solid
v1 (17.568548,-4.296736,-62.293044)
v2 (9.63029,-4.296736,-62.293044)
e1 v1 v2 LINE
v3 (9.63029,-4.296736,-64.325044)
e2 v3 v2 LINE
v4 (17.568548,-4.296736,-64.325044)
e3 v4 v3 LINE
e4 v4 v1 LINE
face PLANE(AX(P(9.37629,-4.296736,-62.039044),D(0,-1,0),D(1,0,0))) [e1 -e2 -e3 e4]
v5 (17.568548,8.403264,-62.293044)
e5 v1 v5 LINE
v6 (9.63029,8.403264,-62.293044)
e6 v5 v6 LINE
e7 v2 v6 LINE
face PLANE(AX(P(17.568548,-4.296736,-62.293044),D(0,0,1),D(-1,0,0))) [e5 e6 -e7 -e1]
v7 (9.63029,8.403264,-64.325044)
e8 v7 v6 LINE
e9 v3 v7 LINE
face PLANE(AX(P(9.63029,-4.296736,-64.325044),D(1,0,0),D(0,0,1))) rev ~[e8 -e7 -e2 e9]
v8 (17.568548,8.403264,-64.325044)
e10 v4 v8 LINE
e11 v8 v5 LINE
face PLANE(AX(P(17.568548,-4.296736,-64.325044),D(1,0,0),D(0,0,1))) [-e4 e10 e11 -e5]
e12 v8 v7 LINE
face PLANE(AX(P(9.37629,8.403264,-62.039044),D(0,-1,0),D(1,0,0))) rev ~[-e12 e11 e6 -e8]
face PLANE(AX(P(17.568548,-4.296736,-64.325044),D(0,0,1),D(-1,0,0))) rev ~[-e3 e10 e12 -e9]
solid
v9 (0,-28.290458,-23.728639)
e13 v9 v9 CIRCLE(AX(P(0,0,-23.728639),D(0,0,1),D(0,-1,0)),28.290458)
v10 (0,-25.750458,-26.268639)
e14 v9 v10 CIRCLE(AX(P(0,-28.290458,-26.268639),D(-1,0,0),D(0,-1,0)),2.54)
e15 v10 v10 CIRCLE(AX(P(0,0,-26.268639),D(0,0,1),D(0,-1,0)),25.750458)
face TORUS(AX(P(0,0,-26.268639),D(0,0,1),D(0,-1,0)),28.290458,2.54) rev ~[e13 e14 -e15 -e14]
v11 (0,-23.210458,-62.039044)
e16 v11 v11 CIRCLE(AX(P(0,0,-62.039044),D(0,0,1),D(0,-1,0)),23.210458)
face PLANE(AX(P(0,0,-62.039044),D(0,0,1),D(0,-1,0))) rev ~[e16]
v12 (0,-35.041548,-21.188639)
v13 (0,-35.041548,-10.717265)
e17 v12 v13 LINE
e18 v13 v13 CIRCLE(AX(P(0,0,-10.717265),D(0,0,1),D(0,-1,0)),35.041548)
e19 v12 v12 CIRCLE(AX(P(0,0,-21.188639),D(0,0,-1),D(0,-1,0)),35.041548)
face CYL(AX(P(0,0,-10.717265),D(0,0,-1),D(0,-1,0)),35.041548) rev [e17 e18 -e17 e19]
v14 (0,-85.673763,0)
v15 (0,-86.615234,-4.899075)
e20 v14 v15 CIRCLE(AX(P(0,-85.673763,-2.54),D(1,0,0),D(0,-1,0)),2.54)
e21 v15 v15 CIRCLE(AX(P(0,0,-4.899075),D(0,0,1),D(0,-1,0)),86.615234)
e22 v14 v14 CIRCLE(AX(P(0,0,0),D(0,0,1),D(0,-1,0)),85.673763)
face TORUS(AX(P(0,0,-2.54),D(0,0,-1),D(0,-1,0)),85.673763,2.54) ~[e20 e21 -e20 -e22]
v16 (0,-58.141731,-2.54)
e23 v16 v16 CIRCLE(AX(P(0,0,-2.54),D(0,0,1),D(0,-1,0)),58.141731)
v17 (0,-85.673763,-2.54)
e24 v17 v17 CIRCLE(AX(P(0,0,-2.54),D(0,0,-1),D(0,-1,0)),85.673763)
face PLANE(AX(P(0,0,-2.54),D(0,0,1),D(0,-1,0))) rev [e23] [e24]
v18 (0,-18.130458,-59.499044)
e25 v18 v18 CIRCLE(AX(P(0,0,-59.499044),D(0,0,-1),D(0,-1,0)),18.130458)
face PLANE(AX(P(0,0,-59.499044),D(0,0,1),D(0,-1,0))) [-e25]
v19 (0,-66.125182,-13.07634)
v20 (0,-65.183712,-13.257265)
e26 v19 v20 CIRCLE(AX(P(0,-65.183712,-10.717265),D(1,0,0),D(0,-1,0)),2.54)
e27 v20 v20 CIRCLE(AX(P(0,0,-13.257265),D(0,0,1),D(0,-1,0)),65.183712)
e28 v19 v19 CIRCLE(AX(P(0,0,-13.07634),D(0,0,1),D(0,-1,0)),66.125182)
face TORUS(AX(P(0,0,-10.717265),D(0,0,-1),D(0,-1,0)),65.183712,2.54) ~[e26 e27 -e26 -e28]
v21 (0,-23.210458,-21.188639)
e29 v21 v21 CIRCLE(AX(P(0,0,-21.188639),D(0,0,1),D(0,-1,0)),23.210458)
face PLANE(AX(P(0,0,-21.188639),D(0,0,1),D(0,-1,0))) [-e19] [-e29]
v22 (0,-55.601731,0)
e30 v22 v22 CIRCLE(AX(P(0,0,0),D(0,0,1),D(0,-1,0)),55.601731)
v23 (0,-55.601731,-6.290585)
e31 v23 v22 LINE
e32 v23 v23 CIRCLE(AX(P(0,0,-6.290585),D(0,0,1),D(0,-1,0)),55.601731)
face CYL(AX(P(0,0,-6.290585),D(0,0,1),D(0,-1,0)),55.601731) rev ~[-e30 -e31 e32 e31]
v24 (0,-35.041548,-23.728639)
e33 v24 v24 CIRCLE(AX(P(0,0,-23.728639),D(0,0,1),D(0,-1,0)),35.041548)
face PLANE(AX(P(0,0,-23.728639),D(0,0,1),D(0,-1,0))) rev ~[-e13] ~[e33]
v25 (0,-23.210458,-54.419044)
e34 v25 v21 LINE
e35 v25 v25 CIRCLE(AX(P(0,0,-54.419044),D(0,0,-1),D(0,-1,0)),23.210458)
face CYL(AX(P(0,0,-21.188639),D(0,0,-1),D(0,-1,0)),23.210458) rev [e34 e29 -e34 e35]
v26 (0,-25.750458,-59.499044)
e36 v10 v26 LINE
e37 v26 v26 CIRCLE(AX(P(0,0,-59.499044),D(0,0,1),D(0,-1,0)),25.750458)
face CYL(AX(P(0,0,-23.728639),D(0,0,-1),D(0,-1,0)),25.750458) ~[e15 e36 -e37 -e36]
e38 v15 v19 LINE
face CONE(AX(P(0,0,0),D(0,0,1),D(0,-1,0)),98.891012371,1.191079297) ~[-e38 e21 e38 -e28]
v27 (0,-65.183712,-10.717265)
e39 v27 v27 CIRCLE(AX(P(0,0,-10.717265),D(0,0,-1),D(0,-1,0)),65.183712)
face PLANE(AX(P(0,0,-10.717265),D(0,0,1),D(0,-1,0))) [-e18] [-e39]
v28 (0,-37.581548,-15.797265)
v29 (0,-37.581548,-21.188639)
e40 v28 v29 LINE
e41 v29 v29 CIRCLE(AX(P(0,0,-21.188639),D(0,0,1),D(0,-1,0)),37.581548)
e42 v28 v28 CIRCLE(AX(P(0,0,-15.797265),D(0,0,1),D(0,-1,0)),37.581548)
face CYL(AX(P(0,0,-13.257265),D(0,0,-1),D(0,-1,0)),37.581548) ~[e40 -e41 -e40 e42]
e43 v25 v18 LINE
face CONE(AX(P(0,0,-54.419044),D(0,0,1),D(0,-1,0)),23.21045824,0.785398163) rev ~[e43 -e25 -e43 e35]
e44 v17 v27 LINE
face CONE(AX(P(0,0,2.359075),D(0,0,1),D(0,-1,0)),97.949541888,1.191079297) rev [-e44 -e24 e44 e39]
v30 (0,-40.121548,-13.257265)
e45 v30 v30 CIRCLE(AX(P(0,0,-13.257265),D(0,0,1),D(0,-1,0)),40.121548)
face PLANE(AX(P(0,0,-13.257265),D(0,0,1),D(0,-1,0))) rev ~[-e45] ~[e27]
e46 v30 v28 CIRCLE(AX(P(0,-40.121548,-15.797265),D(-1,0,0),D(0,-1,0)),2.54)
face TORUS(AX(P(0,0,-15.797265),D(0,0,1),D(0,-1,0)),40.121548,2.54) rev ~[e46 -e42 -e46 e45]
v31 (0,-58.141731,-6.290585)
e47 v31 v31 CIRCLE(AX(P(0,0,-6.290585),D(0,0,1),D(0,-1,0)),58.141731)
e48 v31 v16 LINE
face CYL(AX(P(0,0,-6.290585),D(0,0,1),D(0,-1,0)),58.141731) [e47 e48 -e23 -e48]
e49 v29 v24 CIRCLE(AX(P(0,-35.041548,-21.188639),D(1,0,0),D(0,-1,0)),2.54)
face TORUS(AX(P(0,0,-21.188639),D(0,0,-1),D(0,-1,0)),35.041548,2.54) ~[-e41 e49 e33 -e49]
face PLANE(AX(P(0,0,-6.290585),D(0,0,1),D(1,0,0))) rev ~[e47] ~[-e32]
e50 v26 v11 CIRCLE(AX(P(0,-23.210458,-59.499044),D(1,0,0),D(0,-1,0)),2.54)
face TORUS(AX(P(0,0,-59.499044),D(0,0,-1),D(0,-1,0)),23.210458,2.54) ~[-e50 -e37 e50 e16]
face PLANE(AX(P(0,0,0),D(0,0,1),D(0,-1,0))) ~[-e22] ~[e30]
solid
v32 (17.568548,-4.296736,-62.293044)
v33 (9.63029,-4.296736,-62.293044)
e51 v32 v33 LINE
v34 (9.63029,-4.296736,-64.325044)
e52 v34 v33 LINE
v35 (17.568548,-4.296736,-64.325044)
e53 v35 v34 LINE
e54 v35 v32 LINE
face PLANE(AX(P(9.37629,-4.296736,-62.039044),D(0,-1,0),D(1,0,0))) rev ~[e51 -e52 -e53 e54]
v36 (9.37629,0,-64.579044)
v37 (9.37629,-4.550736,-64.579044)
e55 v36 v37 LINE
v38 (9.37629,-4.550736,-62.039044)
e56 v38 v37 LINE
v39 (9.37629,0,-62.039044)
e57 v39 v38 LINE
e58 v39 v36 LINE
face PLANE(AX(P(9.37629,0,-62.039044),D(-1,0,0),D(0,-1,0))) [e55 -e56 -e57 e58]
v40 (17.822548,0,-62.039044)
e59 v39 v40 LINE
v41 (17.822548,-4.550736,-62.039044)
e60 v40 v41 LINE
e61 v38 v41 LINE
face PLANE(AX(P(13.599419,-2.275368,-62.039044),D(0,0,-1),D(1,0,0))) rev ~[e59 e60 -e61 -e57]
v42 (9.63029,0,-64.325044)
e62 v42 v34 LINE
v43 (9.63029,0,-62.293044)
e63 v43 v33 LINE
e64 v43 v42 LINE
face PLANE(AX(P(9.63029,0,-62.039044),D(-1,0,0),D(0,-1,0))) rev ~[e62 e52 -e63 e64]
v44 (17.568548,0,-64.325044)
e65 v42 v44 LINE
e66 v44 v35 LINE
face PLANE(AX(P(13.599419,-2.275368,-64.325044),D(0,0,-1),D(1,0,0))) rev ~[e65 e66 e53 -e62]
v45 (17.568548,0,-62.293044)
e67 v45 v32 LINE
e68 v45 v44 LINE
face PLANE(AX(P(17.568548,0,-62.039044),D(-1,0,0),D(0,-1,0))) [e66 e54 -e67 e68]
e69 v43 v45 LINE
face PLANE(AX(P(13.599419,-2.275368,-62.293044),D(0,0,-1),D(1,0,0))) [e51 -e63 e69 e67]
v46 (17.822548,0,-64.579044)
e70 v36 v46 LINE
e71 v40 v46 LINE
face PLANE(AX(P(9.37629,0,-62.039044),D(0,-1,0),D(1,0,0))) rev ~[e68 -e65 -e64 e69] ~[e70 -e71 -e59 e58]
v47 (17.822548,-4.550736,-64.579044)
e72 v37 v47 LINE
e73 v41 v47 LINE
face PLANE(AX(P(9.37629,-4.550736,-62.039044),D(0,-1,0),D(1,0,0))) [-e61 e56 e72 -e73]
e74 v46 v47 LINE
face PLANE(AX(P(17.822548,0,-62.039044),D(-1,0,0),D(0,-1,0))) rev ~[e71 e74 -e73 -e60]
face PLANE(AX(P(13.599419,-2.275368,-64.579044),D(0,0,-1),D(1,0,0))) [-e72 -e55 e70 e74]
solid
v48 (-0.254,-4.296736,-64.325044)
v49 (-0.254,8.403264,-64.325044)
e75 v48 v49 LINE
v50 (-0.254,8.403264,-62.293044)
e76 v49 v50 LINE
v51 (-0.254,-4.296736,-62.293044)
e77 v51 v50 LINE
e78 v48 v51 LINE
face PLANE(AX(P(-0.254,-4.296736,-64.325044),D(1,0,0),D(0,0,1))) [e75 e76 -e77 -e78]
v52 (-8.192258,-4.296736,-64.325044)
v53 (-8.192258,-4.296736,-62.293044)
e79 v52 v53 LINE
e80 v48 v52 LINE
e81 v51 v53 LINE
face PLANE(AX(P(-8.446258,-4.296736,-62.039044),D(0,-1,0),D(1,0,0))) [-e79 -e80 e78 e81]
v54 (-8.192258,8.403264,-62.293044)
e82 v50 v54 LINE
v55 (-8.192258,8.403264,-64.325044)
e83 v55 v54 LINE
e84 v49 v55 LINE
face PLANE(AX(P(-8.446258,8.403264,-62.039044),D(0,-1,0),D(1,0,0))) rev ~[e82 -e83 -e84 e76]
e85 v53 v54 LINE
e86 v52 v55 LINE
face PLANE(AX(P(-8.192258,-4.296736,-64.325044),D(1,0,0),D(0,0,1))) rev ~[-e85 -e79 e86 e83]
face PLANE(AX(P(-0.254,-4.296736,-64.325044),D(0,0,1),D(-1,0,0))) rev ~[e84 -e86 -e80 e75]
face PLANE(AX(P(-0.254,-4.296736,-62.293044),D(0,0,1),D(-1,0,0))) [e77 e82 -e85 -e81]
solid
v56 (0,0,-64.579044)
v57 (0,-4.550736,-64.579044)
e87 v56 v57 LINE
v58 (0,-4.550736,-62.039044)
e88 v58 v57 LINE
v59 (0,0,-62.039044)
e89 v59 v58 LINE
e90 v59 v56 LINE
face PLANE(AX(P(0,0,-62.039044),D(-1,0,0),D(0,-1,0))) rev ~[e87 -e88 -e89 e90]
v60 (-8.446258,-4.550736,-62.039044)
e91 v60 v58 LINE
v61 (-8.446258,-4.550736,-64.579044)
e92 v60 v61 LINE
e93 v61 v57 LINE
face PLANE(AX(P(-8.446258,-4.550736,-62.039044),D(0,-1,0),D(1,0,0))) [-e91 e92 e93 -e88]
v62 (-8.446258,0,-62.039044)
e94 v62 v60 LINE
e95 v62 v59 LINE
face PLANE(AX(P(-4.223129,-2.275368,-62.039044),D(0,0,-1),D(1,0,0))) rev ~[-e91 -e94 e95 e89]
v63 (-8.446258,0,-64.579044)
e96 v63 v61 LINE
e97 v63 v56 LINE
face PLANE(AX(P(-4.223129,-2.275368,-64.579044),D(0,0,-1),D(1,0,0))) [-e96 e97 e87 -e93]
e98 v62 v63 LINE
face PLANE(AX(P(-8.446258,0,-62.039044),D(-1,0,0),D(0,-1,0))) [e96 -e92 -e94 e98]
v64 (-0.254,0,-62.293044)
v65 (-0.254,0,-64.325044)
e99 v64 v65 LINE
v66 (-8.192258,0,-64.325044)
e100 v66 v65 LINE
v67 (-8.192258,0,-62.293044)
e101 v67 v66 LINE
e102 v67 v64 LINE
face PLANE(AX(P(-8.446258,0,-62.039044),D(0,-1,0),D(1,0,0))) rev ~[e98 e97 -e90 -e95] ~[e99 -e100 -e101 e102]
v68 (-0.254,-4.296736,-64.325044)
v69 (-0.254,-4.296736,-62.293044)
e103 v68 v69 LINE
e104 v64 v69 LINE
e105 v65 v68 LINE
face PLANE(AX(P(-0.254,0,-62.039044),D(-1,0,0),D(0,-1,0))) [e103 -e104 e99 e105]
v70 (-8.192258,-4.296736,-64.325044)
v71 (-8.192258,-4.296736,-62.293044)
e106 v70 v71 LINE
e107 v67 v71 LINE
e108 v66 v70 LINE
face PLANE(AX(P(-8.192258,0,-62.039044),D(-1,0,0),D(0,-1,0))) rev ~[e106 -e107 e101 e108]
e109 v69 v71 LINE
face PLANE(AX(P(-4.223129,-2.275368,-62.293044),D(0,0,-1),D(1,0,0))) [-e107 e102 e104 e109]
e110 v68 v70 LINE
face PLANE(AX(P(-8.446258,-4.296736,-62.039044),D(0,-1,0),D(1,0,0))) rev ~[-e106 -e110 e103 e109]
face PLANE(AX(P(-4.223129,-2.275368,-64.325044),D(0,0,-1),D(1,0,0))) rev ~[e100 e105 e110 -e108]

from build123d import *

# Parameters (mm, degrees)
F2_T     = 2.54
F3_R     = 2.54
F4_SIZE  = 5.08
F5_W     = 8.4462584928
F5_H     = 4.5507363975
F6_DEPTH = 2.54
F7_T     = -0.254
F7_2_T   = -0.254
F8_DEPTH = 12.7


# Not quite as in the source:
# - a shell that OpenCascade refuses in one call is made with other operations: the cavity is built on its own and cut out


with BuildPart() as f1:
    # F0 (on Right) → F1 (revolve)
    with BuildSketch(Plane.YZ):
        Polygon((-55.6017309427, 0), (-98.8910123706, 0), (-65.6718313694, -13.2572650909), (-37.5815480947, -13.2572650909), (-37.5815480947, -23.7286388874), (-25.7504582405, -23.7286388874), (-25.7504582405, -62.0390437543), (0, -62.0390437543), (0, -6.2905848026), (-55.6017309427, -6.2905848026), align=None)
    revolve(axis=Axis((0, 0, 15.0363594294), (0, 0, 1)))

    # F2: shell of thickness 2.54, made by hand


with BuildPart() as f2_core1:
    # F2_t2: copy of F1
    add(f1.part)

    # the walls: a layer under each face that stays
    f2_faces = [f2_core1.faces().sort_by_distance(p)[0] for p in [
        (0, 55.6017309427, -3.1452924013),
        (-65.9273415804, -65.9273415804, 0),
        (0, 82.28142187, -6.6286325455),
        (-43.7812209129, 43.7812209129, -13.2572650909),
        (0, 37.5815480947, -18.4929519892),
        (-25.0543653965, 25.0543653965, -23.7286388874),
        (0, 25.7504582405, -42.8838413209),
        (0, 0, -62.0390437543),
    ]]
    thicken(f2_faces, amount=-F2_T, mode=Mode.SUBTRACT)

    # F2_s3 → F2_t4 (revolve, cut)
    with BuildSketch(Plane.YZ):
        Polygon((-37.6069480947, -13.2826650909), (-37.5815480947, -10.7172650909), (-35.0415480947, -10.7172650909), (-35.0415480947, -13.2572650909), align=None)
    revolve(axis=Axis((0, 0, -13.2572650909), (0, 0, 1)), mode=Mode.SUBTRACT)

    # F2_s5 → F2_t6 (revolve, cut)
    with BuildSketch(Plane.YZ):
        Polygon((-25.7758582405, -23.7540388874), (-25.7504582405, -21.1886388874), (-23.2104582405, -21.1886388874), (-23.2104582405, -23.7286388874), align=None)
    revolve(axis=Axis((0, 0, -23.7286388874), (0, 0, 1)), mode=Mode.SUBTRACT)


with BuildPart() as f1_1:
    add(f1.part)

    # what is left inside the walls is the cavity
    f2_cavity = [f2_core1.part.solids().sort_by_distance(p)[0] for p in [
        (-66.635149, 42.836882, -2.5654),
    ]]
    add(f2_cavity, mode=Mode.SUBTRACT)

    # F3
    f3_edges = [f1_1.edges().sort_by_distance(p)[0] for p in [
        (0, 25.750458, -62.039044),
        (0, 25.750458, -23.728639),
        (0, 37.581548, -13.257265),
        (0, 37.581548, -23.728639),
        (0, 65.671831, -13.257265),
        (0, 98.891012, 0),
    ]]
    fillet(f3_edges, radius=F3_R)

    # F4
    f4_edges = [f1_1.edges().sort_by_distance(p)[0] for p in [
        (0, 23.210458, -59.499044),
    ]]
    chamfer(f4_edges, length=F4_SIZE)


with BuildPart() as f6:
    # F5 (on face) → F6 (new body)
    with BuildSketch(Plane(origin=(0, 0, -62.0390437543), x_dir=(1, 0, 0), z_dir=(0, 0, -1))):
        with Locations((13.5994190318, 2.2753681988)):
            Rectangle(F5_W, F5_H)
    extrude(amount=F6_DEPTH)

    # F7#2
    f7_2_openings = [f6.faces().sort_by_distance(p)[0] for p in [
        (13.599419, 0, -63.309044),
    ]]
    offset(amount=F7_2_T, openings=f7_2_openings)


with BuildPart() as f6b:
    # F5 (on face) → F6, piece 2 (new body)
    with BuildSketch(Plane(origin=(0, 0, -62.0390437543), x_dir=(1, 0, 0), z_dir=(0, 0, -1))):
        with Locations((-4.2231292464, 2.2753681988)):
            Rectangle(F5_W, F5_H)
    extrude(amount=F6_DEPTH)

    # F7
    f7_openings = [f6b.faces().sort_by_distance(p)[0] for p in [
        (-4.223129, 0, -63.309044),
    ]]
    offset(amount=F7_T, openings=f7_openings)


with BuildPart() as f8:
    # F8 (new): a face of the model
    f8_faces = [f6.part.faces().sort_by_distance(p)[0] for p in [
        (13.5994190318, -4.2967363975, -63.3090437543),
    ]]
    extrude(f8_faces, amount=F8_DEPTH)


with BuildPart() as f8b:
    # F8#2 (new): a face of the model
    f8_2_faces = [f6b.part.faces().sort_by_distance(p)[0] for p in [
        (-4.2231292464, -4.2967363975, -63.3090437543),
    ]]
    extrude(f8_2_faces, amount=F8_DEPTH)


solid = Compound([f1_1.part, f6.part, f6b.part, f8.part, f8b.part])
